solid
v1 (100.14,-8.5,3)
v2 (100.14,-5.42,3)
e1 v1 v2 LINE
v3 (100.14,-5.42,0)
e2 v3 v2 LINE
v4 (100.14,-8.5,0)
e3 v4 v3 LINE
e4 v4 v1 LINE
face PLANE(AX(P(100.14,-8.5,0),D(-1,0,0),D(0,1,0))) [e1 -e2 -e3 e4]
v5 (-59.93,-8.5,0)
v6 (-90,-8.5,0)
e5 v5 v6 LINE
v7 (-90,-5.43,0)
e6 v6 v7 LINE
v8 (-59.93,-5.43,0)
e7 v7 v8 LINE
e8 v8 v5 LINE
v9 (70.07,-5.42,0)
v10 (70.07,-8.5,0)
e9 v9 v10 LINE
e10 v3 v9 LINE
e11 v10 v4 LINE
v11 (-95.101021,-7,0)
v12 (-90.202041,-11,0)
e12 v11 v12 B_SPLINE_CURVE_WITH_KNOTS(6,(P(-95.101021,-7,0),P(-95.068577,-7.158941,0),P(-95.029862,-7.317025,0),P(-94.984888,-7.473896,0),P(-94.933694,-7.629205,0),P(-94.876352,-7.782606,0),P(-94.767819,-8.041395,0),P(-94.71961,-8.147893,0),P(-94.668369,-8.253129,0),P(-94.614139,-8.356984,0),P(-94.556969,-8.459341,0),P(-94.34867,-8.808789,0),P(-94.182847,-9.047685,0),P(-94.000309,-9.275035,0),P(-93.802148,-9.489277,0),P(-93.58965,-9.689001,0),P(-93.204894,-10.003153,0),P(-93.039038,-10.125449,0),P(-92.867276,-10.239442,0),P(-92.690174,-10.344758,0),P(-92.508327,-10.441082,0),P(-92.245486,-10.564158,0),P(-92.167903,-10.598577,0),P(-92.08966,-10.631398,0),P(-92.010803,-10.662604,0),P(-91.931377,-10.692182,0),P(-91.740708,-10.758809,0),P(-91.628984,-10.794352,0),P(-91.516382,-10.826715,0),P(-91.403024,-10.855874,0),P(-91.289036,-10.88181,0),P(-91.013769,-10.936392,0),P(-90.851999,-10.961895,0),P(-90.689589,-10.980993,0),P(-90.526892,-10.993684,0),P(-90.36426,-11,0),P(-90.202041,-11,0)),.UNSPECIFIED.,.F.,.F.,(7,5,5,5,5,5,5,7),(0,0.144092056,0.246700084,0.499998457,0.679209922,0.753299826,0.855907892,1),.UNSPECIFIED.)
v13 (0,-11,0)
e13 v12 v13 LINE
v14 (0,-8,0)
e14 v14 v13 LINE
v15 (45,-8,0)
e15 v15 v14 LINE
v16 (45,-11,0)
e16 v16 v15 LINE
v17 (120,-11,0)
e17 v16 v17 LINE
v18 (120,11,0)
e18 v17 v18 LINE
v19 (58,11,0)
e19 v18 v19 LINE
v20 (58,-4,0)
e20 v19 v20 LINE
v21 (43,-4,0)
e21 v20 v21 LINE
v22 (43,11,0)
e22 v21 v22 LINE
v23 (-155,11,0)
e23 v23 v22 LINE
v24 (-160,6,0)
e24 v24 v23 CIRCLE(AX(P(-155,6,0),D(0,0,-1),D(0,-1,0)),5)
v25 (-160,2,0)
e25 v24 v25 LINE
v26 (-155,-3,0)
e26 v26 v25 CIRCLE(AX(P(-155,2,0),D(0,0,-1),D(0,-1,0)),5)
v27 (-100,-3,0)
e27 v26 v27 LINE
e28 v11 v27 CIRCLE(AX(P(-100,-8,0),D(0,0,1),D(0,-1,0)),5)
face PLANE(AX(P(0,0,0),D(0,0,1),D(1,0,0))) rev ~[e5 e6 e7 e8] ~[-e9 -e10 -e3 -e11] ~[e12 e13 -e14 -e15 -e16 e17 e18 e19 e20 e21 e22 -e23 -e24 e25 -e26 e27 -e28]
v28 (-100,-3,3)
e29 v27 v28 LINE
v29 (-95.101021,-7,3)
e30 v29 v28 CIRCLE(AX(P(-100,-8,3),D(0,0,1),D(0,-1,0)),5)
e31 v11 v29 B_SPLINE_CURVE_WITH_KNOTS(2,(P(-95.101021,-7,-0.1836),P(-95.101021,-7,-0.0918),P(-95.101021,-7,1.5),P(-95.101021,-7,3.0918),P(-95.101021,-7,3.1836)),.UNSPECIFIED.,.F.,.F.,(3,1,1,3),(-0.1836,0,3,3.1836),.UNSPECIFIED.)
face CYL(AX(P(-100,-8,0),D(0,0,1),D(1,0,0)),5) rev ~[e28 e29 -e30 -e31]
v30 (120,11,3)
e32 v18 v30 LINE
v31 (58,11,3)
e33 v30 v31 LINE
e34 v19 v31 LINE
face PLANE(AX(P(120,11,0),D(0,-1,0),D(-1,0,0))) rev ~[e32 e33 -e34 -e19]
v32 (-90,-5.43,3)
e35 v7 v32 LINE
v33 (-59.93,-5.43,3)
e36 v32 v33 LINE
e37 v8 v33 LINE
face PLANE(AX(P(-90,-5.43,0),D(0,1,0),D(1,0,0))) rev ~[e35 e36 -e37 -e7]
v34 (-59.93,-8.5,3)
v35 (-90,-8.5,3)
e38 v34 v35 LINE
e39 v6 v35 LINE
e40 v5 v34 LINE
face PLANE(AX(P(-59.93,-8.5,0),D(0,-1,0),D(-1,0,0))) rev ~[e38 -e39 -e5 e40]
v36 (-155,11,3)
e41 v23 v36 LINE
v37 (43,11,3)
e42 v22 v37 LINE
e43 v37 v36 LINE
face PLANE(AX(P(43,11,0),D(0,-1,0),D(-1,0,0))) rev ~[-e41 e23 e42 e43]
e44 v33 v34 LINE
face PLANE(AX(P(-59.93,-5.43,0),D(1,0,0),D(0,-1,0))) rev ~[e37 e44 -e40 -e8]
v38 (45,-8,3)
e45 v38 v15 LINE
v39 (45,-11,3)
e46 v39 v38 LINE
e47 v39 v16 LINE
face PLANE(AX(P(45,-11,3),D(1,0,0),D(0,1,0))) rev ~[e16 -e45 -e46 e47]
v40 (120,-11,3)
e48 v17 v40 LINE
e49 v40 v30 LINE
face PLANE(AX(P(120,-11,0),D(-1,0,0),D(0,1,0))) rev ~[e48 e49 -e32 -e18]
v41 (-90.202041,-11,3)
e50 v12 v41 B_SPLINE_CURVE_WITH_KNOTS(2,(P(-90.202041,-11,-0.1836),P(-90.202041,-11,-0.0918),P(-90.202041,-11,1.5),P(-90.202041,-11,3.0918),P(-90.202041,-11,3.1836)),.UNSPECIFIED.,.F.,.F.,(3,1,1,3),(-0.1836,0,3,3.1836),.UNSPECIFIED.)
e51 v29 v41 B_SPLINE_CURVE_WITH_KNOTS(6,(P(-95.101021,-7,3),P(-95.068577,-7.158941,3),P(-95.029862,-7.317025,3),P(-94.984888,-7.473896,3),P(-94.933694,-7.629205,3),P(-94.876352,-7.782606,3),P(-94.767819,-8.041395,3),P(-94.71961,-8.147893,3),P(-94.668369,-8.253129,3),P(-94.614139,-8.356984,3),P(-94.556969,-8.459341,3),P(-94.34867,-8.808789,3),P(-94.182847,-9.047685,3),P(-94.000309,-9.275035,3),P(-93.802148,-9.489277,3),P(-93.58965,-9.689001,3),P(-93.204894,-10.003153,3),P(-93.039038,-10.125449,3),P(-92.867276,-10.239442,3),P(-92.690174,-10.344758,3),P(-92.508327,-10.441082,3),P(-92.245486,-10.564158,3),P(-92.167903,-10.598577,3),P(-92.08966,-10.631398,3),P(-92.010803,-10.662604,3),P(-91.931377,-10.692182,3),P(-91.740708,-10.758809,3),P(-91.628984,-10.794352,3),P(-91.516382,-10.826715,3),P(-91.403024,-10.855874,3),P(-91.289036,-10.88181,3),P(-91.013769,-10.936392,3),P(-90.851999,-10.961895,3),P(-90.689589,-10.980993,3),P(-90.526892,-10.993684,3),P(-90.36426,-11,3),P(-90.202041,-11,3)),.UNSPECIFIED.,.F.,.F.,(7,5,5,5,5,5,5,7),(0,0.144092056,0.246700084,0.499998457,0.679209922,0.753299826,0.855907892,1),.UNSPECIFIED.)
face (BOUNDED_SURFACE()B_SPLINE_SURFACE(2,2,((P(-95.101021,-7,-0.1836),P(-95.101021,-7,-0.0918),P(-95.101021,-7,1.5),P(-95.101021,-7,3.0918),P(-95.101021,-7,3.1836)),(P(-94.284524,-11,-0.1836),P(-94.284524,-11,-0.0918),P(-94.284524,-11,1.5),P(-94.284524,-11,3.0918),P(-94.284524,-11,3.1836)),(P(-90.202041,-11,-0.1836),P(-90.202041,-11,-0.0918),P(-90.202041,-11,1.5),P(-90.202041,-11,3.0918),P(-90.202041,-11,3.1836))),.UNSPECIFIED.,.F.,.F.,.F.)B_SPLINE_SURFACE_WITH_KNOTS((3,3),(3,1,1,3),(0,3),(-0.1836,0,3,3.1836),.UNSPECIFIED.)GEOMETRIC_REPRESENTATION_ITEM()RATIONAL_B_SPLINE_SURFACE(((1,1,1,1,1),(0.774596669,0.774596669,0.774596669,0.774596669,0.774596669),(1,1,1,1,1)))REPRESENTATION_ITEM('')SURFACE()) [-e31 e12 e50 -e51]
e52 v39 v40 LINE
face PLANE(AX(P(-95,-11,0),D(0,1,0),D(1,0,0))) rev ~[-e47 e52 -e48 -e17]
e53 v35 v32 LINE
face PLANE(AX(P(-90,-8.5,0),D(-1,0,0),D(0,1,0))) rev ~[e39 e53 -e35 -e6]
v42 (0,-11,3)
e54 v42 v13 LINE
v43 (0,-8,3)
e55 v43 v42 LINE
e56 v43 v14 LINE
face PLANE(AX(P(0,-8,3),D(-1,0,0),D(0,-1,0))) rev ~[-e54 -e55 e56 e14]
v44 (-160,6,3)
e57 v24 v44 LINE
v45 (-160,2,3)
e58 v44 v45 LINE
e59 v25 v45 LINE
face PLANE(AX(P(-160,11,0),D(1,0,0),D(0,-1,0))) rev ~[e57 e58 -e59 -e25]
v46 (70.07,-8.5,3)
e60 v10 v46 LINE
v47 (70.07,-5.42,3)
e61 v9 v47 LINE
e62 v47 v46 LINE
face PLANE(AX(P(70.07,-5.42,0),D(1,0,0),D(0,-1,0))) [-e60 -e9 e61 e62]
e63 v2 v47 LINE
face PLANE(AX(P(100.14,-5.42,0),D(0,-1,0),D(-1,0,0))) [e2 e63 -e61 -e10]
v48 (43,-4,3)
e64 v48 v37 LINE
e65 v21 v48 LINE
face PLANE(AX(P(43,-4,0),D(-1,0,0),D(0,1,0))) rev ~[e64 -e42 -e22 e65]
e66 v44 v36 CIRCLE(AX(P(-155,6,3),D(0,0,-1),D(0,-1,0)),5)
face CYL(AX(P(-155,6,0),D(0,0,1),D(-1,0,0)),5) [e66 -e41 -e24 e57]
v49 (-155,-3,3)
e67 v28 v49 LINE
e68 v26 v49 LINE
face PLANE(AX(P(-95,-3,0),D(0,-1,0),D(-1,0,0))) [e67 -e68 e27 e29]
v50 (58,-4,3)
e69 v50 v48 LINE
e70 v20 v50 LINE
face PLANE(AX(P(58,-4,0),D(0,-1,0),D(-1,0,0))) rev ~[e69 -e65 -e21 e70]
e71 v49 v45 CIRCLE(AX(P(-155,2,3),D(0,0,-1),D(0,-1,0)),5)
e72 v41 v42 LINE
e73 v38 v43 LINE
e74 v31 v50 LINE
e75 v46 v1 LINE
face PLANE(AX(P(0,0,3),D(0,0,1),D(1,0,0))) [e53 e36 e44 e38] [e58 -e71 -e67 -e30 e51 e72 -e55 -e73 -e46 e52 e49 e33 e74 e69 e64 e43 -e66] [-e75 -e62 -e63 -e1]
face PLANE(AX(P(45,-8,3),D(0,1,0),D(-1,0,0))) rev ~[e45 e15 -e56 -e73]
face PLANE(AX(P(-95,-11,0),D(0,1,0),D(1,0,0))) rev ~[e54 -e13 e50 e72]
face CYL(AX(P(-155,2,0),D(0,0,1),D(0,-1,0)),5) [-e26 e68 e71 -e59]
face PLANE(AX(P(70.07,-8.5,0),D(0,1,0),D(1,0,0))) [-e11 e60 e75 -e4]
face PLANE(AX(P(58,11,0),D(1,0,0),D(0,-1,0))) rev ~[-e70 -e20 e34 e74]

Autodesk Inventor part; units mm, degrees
ref_plane "YZ Plane" through (0, 0, 0) normal (1, 0, 0) x (0, 1, 0)
ref_plane "XZ Plane" through (0, 0, 0) normal (0, 1, 0) x (-1, 0, 0)
ref_plane "XY Plane" through (0, 0, 0) normal (0, 0, 1) x (1, 0, 0)
sketch "Sketch1" plane through (0, 0, 0) normal (0, 0, 1) x (1, 0, 0)
  line L0 (-120, -11) -> (120, -11)
  line L1 (120, -11) -> (120, 11)
  line L2 (120, 11) -> (-120, 11)
  line L3 (-120, 11) -> (-120, -11)
  line L4 (-120, -11) -> (120, 11) construction
  line L5 (120, -11) -> (-120, 11) construction
  line L6 (-90, -5.43) -> (-59.93, -5.43)
  line L7 (-59.93, -5.43) -> (-59.93, -8.5)
  line L8 (-59.93, -8.5) -> (-90, -8.5)
  line L9 (-90, -8.5) -> (-90, -5.43)
  line L10 (-90, -5.43) -> (-59.93, -8.5) construction
  line L11 (-59.93, -5.43) -> (-90, -8.5) construction
  line L12 (100.14, -5.42) -> (70.07, -5.42)
  line L13 (70.07, -5.42) -> (70.07, -8.5)
  line L14 (70.07, -8.5) -> (100.14, -8.5)
  line L15 (100.14, -8.5) -> (100.14, -5.42)
  line L16 (100.14, -5.42) -> (70.07, -8.5) construction
  line L17 (70.07, -5.42) -> (100.14, -8.5) construction
  line L18 (-120, -11) -> (-95, -11)
  line L19 (-95, -11) -> (-95, -3)
  line L20 (-95, -3) -> (-120, -3)
  line L21 (-120, -3) -> (-120, -11)
  line L22 (43, 11) -> (58, 11)
  line L23 (58, 11) -> (58, -4)
  line L24 (58, -4) -> (43, -4)
  line L25 (43, -4) -> (43, 11)
  line L26 (-120, 11) -> (-160, 11)
  line L27 (-160, 11) -> (-160, -3)
  line L28 (-160, -3) -> (-120, -3)
  line L29 (-120, -3) -> (-120, 11)
  point P0 (0, 0)
  point P1 (0, 0)
  point P2 (-74.965, -6.965)
  point P3 (85.105, -6.96)
  point P4 (58, 11)
  point P5 (-140, -3)
  dimension "d0" = 240
  dimension "d1" = 22
  dimension "d2" = 30.07
  dimension "d3" = 3.07
  dimension "d4" = 2.5
  dimension "d5" = 30
  dimension "d6" = 30.07
  dimension "d7" = 3.08
  dimension "d8" = 2.5
  dimension "d9" = 130
  dimension "d10" = 25
  dimension "d11" = 8
  dimension "d12" = 15
  dimension "d13" = 15
  dimension "d14" = 43
  dimension "d17" = 40
extrude "Plate1" add sketch "Sketch1" along normal blind 3 contours L19 L20 L3 L2 L25 L24 L23 L1 L0 | L28 L27 L26 L3
fillet "Corner Round1" radius 5 4 edges at (-95, -3, 1.5) (-95, -11, 1.5) (-160, -3, 1.5) (-160, 11, 1.5)
sketch "Sketch3" plane through (0, 0, 3) normal (0, 0, 1) x (1, 0, 0)
  line L0 (-90.202, -11) -> (120, -11) projected
  line L1 (0, -11) -> (45, -11)
  line L2 (45, -11) -> (45, -8)
  line L3 (45, -8) -> (0, -8)
  line L4 (0, -8) -> (0, -11)
  point P0 (0, 0)
  dimension "d22" = 3
  dimension "d23" = 45
extrude "Cut2" cut sketch "Sketch3" against normal blind 3
equation "\"d24\" = Thickness"
equation "\"d15\" = Thickness"
equation "\"BendRadius\" = Thickness"
equation "\"BendReliefWidth\" = Thickness"
equation "\"BendReliefDepth\" = 0.5 * Thickness"
equation "\"CornerReliefSize\" = 4 * Thickness"
equation "\"MinimumRemnant\" = 2 * Thickness"
equation "\"TransitionRadius\" = BendRadius"
equation "\"JacobiRadiusSize\" = BendRadius"
equation "\"GapSize\" = Thickness"
equation "\"Thickness\" = 3"
properties part number "Starting Path Wall ( Servo )"
